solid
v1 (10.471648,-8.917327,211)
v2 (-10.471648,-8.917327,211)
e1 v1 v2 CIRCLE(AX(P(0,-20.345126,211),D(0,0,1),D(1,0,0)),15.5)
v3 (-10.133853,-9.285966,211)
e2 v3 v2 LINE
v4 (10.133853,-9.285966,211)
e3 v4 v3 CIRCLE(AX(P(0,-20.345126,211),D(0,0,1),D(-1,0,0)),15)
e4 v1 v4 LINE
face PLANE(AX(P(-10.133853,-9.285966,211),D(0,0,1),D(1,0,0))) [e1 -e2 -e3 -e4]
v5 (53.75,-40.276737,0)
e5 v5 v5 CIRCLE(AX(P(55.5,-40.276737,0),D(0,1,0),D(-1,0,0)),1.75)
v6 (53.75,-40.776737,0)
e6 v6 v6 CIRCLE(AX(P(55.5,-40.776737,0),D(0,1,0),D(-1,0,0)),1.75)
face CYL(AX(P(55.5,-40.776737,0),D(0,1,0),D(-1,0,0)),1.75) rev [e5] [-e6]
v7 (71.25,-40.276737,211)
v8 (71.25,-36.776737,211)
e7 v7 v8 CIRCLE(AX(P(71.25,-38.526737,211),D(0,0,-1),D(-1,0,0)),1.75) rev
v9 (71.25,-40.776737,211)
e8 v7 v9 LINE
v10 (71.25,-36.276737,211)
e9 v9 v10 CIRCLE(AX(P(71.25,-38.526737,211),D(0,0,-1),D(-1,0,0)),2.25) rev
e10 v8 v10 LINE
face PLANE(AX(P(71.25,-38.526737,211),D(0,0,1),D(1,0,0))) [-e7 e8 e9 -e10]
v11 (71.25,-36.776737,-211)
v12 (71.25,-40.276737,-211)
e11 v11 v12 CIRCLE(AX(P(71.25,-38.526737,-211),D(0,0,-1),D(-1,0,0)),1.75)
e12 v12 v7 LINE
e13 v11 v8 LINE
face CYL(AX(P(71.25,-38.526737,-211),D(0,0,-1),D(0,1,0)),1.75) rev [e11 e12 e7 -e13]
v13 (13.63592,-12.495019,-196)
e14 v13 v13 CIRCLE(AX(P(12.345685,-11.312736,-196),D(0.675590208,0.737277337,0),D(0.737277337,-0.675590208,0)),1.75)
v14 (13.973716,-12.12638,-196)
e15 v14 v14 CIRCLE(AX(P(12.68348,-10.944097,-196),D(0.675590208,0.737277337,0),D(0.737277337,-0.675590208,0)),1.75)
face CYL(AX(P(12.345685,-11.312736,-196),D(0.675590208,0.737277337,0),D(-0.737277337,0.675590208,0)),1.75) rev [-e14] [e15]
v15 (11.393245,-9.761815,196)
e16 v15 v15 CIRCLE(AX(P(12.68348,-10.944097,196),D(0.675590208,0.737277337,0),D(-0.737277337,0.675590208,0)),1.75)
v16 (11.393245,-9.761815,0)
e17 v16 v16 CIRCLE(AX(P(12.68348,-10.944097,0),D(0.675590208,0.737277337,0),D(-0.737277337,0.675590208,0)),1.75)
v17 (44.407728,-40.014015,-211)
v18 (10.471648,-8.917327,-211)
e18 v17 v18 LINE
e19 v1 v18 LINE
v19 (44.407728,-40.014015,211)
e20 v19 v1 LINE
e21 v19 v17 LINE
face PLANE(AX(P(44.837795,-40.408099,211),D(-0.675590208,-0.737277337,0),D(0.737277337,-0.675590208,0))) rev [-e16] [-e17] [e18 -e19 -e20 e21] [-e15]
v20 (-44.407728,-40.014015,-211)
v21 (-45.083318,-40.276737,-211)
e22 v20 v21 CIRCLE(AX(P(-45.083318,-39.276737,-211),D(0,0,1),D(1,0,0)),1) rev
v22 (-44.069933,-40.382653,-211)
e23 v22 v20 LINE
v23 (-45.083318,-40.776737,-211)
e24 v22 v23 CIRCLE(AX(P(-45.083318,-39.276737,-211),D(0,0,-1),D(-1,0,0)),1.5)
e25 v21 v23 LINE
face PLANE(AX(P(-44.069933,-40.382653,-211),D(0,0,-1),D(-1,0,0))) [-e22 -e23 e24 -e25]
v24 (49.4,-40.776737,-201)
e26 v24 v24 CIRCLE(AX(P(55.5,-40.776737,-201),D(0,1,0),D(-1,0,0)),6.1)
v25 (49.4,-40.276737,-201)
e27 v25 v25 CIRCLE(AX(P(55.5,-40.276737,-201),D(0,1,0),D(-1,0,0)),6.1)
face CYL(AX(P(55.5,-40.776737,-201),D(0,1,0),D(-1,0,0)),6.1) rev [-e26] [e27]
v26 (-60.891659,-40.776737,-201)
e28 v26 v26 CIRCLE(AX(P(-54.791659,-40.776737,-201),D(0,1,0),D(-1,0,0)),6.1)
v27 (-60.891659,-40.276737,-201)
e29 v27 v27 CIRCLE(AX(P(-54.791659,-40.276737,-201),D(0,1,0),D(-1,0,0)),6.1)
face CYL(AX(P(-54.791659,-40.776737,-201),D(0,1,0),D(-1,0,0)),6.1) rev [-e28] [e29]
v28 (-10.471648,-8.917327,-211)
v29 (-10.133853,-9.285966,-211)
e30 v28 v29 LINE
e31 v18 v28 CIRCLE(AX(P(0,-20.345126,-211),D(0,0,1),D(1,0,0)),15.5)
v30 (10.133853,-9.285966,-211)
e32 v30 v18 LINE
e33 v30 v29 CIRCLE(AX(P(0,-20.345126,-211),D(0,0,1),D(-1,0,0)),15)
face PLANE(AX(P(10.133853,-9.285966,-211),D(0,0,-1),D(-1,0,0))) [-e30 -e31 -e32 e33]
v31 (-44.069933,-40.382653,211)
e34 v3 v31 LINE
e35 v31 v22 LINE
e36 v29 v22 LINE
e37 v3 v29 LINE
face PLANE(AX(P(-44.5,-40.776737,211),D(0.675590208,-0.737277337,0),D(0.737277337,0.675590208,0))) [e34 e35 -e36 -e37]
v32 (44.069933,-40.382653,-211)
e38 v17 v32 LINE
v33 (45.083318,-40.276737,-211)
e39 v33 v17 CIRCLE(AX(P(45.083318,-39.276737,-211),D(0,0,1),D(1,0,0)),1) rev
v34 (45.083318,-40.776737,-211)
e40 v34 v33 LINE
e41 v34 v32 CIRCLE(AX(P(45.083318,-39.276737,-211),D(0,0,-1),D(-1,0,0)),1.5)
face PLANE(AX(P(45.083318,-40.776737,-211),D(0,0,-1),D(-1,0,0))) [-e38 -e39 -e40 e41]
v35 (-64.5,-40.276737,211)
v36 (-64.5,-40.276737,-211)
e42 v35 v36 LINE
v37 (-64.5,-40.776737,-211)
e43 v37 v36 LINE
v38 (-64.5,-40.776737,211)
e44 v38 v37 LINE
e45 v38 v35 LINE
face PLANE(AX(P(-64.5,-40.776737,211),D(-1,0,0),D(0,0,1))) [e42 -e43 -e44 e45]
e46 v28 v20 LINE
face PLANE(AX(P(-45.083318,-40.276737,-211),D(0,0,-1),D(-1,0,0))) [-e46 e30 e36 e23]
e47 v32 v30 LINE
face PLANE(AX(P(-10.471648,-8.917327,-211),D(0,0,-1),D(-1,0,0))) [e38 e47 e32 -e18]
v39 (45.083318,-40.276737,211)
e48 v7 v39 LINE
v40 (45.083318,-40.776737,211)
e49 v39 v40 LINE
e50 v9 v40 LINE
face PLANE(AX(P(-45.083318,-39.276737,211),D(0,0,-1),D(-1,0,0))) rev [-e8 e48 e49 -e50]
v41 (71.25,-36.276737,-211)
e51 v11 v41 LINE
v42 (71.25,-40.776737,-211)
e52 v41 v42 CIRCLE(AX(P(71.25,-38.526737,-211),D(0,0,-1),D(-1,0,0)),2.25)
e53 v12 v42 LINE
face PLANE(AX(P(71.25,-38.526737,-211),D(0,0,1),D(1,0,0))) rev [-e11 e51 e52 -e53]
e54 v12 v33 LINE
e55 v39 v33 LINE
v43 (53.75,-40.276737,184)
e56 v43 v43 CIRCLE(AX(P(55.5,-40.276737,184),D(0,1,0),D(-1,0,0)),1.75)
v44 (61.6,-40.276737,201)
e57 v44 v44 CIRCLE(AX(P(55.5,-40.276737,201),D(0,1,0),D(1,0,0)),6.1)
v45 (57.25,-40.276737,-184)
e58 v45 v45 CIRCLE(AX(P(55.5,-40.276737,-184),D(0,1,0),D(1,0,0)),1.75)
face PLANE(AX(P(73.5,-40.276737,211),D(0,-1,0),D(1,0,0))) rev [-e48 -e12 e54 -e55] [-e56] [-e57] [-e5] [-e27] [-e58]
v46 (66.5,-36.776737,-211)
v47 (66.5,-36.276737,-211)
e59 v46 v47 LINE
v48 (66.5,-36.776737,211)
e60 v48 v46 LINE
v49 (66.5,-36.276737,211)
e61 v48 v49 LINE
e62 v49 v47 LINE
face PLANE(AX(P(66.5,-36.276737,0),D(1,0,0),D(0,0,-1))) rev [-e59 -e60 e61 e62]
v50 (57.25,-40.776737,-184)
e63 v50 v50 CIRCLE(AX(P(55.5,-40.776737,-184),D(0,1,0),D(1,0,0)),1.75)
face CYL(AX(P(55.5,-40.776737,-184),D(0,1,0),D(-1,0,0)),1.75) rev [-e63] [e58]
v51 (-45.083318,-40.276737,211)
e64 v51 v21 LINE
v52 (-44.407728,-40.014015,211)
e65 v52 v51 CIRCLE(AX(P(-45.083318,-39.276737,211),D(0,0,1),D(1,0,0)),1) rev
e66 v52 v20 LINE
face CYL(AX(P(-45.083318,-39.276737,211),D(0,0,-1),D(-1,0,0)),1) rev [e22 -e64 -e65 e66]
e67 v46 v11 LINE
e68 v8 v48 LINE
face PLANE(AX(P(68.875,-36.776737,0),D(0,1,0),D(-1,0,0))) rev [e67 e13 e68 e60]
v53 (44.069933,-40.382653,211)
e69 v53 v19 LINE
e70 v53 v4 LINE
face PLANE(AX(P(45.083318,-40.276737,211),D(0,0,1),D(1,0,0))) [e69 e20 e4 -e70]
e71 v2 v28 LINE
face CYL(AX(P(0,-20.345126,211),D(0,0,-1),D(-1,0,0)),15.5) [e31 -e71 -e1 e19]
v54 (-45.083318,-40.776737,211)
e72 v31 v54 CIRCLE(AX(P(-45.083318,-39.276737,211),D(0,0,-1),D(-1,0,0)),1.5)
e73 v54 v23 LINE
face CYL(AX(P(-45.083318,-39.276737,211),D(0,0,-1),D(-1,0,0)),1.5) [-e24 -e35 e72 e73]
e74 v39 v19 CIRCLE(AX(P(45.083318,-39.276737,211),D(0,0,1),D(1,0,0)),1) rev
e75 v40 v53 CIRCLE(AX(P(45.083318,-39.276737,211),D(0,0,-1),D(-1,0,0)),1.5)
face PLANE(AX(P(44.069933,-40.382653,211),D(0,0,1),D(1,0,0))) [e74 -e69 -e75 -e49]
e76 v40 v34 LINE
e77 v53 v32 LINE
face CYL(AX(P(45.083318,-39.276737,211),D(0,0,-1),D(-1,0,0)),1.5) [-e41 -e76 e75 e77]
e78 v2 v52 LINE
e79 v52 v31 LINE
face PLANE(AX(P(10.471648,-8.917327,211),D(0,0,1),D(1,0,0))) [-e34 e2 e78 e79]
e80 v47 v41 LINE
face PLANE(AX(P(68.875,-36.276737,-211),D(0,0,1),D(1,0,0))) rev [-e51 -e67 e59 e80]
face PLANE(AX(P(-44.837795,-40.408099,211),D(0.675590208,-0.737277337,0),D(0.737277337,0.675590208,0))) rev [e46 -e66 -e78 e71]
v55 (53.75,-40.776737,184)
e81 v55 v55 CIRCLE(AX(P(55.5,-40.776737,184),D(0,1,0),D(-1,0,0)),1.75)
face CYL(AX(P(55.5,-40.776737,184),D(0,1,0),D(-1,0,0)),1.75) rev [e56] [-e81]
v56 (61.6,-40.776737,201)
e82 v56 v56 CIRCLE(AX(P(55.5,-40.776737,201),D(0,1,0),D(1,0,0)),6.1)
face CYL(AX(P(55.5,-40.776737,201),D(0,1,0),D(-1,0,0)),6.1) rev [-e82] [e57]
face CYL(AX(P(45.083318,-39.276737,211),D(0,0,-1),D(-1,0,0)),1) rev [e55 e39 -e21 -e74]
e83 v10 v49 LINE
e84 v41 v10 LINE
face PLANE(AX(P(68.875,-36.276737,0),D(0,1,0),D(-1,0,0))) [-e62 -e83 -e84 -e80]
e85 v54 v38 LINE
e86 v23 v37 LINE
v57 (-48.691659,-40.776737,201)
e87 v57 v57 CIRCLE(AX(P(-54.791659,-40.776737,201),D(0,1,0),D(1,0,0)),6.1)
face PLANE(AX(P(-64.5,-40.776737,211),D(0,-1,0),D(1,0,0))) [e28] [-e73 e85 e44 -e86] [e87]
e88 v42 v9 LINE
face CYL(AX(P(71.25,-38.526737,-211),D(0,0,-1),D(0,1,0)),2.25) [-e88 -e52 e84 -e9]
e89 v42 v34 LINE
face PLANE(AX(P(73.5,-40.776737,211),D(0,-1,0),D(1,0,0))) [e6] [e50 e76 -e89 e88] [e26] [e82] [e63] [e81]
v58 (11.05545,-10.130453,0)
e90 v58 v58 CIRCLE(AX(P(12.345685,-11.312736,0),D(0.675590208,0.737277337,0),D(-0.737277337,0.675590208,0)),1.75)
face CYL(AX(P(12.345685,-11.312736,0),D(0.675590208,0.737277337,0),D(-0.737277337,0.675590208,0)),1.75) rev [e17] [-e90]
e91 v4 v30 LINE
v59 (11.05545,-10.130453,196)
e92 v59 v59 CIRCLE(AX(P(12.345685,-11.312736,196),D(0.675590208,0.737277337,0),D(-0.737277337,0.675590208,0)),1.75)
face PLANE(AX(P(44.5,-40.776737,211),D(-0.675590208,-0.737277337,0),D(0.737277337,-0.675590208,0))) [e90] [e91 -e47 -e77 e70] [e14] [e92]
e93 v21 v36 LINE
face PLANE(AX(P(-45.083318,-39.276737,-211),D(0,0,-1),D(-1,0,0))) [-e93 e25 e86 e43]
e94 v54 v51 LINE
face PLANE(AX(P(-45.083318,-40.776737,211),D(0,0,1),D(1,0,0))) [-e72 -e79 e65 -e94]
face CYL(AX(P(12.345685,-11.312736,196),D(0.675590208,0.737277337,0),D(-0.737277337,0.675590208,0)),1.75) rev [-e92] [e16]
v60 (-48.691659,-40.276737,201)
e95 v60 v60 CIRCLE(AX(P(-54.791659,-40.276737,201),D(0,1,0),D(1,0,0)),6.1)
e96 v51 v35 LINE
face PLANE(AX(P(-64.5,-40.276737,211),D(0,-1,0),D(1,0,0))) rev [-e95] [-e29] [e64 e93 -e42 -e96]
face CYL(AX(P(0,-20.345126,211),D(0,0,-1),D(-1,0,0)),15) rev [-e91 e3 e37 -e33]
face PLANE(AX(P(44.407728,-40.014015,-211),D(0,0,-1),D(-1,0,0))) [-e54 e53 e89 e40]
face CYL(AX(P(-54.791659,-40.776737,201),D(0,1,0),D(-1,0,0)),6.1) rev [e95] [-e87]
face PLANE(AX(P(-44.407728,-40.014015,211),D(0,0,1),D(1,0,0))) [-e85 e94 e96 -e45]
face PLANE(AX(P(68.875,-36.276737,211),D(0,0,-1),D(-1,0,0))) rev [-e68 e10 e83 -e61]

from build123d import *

# Parameters (mm, degrees)
BASE_FLANGE1_DEPTH = 211
SKETCH13_R         = 6.1
EXTRUDE1_DEPTH     = 0.5
SKETCH16_R         = 1.75
EXTRUDE2_DEPTH     = 0.5
SKETCH17_R         = 1.75
EXTRUDE3_DEPTH     = 0.5
SKETCH18_R         = 1.75
EXTRUDE4_DEPTH     = 0.5
HEM1_START         = -211
HEM1_DEPTH         = 422
HEM1_2_DEPTH       = 422


# Read off the part's stored shape, not the designer's step: Hem1
# Sheet-metal steps are written as plain solids
with BuildPart() as part:
    # Sketch1 → Base-Flange1 (new, symmetric)
    with BuildSketch(Plane.XY):
        with BuildLine():
            Line((-64.5, -40.776737244), (-45.083318098, -40.776737244))
            ThreePointArc((-45.083318098, -40.776737244), (-44.53966104, -40.674749048), (-44.069932786, -40.382653249))
            Line((-44.069932786, -40.382653249), (-10.133853114, -9.285965521))
            ThreePointArc((-10.133853114, -9.285965521), (0, -5.345125574), (10.133853114, -9.285965521))
            Line((10.133853114, -9.285965521), (44.069932786, -40.382653249))
            ThreePointArc((44.069932786, -40.382653249), (44.53966104, -40.674749048), (45.083318098, -40.776737244))
            Line((45.083318098, -40.776737244), (73.5, -40.776737244))
            Line((73.5, -40.776737244), (73.5, -40.276737244))
            Line((73.5, -40.276737244), (45.083318098, -40.276737244))
            ThreePointArc((45.083318098, -40.276737244), (44.720880059, -40.208745113), (44.40772789, -40.014014581))
            Line((44.40772789, -40.014014581), (10.471648218, -8.917326853))
            ThreePointArc((10.471648218, -8.917326853), (0, -4.845125574), (-10.471648218, -8.917326853))
            Line((-10.471648218, -8.917326853), (-44.40772789, -40.014014581))
            ThreePointArc((-44.40772789, -40.014014581), (-44.720880059, -40.208745113), (-45.083318098, -40.276737244))
            Line((-45.083318098, -40.276737244), (-64.5, -40.276737244))
            Line((-64.5, -40.276737244), (-64.5, -40.776737244))
        make_face()
    extrude(amount=BASE_FLANGE1_DEPTH, both=True)

    # Sketch13 → Extrude1 (cut)
    with BuildSketch(Plane(origin=(0, -40.276737244, 0), x_dir=(1, 0, 0), z_dir=(0, 1, 0))):
        with Locations(Location((-54.791659049, 201, 0), (0, 0, 180))):
            Circle(SKETCH13_R)
        with Locations(Location((55.5, 201, 0), (0, 0, 180))):
            Circle(SKETCH13_R)
        with Locations((55.5, -201)):
            Circle(SKETCH13_R)
        with Locations((-54.791659049, -201)):
            Circle(SKETCH13_R)
    extrude(amount=-EXTRUDE1_DEPTH, mode=Mode.SUBTRACT)

    # Sketch16 → Extrude2 (cut)
    with BuildSketch(Plane(origin=(0.337795104, 0.368638668, 0), x_dir=(0, 0, -1), z_dir=(0.6755902076156584, 0.7372773368101257, 0))):
        with Locations(Location((-196, -16.74496761, 0), (0, 0, 90))):
            Circle(SKETCH16_R)
        with Locations(Location((196, -16.74496761, 0), (0, 0, 270))):
            Circle(SKETCH16_R)
        with Locations(Location((0, -16.74496761, 0), (0, 0, 90))):
            Circle(SKETCH16_R)
    extrude(amount=-EXTRUDE2_DEPTH, mode=Mode.SUBTRACT)

    # Sketch17 → Extrude3 (cut)
    with BuildSketch(Plane(origin=(0, -40.276737244, 0), x_dir=(1, 0, 0), z_dir=(0, 1, 0))):
        with Locations(Location((55.5, 0, 0), (0, 0, 180))):
            Circle(SKETCH17_R)
    extrude(amount=-EXTRUDE3_DEPTH, mode=Mode.SUBTRACT)

    # Sketch18 → Extrude4 (cut)
    with BuildSketch(Plane(origin=(0, -40.276737244, 0), x_dir=(1, 0, 0), z_dir=(0, 1, 0))):
        with Locations(Location((55.5, -184, 0), (0, 0, 180))):
            Circle(SKETCH18_R)
        with Locations((55.5, 184)):
            Circle(SKETCH18_R)
    extrude(amount=-EXTRUDE4_DEPTH, mode=Mode.SUBTRACT)

    # Hem1 outline → Hem1 (cut)
    with BuildSketch(Plane.XY.offset(HEM1_START)):
        with BuildLine():
            Line((73.5, -40.276737244), (72.664213562, -40.276737244))
            ThreePointArc((72.664213562, -40.276737244), (72, -40.648057588), (71.25, -40.776737244))
            Line((71.25, -40.776737244), (73.5, -40.776737244))
            Line((73.5, -40.776737244), (73.5, -40.276737244))
        make_face()
    extrude(amount=HEM1_DEPTH, mode=Mode.SUBTRACT)

    # Hem1 2 outline → Hem1 2 (add)
    with BuildSketch(Plane.XY.offset(HEM1_START)):
        with BuildLine():
            Line((66.5, -36.276737244), (66.5, -36.776737244))
            Line((66.5, -36.776737244), (71.25, -36.776737244))
            ThreePointArc((71.25, -36.776737244), (73, -38.526737244), (71.25, -40.276737244))
            Line((71.25, -40.276737244), (72.664213562, -40.276737244))
            ThreePointArc((72.664213562, -40.276737244), (73.371320344, -37.776737244), (71.25, -36.276737244))
            Line((71.25, -36.276737244), (66.5, -36.276737244))
        make_face()
    extrude(amount=HEM1_2_DEPTH)


solid = part.part
